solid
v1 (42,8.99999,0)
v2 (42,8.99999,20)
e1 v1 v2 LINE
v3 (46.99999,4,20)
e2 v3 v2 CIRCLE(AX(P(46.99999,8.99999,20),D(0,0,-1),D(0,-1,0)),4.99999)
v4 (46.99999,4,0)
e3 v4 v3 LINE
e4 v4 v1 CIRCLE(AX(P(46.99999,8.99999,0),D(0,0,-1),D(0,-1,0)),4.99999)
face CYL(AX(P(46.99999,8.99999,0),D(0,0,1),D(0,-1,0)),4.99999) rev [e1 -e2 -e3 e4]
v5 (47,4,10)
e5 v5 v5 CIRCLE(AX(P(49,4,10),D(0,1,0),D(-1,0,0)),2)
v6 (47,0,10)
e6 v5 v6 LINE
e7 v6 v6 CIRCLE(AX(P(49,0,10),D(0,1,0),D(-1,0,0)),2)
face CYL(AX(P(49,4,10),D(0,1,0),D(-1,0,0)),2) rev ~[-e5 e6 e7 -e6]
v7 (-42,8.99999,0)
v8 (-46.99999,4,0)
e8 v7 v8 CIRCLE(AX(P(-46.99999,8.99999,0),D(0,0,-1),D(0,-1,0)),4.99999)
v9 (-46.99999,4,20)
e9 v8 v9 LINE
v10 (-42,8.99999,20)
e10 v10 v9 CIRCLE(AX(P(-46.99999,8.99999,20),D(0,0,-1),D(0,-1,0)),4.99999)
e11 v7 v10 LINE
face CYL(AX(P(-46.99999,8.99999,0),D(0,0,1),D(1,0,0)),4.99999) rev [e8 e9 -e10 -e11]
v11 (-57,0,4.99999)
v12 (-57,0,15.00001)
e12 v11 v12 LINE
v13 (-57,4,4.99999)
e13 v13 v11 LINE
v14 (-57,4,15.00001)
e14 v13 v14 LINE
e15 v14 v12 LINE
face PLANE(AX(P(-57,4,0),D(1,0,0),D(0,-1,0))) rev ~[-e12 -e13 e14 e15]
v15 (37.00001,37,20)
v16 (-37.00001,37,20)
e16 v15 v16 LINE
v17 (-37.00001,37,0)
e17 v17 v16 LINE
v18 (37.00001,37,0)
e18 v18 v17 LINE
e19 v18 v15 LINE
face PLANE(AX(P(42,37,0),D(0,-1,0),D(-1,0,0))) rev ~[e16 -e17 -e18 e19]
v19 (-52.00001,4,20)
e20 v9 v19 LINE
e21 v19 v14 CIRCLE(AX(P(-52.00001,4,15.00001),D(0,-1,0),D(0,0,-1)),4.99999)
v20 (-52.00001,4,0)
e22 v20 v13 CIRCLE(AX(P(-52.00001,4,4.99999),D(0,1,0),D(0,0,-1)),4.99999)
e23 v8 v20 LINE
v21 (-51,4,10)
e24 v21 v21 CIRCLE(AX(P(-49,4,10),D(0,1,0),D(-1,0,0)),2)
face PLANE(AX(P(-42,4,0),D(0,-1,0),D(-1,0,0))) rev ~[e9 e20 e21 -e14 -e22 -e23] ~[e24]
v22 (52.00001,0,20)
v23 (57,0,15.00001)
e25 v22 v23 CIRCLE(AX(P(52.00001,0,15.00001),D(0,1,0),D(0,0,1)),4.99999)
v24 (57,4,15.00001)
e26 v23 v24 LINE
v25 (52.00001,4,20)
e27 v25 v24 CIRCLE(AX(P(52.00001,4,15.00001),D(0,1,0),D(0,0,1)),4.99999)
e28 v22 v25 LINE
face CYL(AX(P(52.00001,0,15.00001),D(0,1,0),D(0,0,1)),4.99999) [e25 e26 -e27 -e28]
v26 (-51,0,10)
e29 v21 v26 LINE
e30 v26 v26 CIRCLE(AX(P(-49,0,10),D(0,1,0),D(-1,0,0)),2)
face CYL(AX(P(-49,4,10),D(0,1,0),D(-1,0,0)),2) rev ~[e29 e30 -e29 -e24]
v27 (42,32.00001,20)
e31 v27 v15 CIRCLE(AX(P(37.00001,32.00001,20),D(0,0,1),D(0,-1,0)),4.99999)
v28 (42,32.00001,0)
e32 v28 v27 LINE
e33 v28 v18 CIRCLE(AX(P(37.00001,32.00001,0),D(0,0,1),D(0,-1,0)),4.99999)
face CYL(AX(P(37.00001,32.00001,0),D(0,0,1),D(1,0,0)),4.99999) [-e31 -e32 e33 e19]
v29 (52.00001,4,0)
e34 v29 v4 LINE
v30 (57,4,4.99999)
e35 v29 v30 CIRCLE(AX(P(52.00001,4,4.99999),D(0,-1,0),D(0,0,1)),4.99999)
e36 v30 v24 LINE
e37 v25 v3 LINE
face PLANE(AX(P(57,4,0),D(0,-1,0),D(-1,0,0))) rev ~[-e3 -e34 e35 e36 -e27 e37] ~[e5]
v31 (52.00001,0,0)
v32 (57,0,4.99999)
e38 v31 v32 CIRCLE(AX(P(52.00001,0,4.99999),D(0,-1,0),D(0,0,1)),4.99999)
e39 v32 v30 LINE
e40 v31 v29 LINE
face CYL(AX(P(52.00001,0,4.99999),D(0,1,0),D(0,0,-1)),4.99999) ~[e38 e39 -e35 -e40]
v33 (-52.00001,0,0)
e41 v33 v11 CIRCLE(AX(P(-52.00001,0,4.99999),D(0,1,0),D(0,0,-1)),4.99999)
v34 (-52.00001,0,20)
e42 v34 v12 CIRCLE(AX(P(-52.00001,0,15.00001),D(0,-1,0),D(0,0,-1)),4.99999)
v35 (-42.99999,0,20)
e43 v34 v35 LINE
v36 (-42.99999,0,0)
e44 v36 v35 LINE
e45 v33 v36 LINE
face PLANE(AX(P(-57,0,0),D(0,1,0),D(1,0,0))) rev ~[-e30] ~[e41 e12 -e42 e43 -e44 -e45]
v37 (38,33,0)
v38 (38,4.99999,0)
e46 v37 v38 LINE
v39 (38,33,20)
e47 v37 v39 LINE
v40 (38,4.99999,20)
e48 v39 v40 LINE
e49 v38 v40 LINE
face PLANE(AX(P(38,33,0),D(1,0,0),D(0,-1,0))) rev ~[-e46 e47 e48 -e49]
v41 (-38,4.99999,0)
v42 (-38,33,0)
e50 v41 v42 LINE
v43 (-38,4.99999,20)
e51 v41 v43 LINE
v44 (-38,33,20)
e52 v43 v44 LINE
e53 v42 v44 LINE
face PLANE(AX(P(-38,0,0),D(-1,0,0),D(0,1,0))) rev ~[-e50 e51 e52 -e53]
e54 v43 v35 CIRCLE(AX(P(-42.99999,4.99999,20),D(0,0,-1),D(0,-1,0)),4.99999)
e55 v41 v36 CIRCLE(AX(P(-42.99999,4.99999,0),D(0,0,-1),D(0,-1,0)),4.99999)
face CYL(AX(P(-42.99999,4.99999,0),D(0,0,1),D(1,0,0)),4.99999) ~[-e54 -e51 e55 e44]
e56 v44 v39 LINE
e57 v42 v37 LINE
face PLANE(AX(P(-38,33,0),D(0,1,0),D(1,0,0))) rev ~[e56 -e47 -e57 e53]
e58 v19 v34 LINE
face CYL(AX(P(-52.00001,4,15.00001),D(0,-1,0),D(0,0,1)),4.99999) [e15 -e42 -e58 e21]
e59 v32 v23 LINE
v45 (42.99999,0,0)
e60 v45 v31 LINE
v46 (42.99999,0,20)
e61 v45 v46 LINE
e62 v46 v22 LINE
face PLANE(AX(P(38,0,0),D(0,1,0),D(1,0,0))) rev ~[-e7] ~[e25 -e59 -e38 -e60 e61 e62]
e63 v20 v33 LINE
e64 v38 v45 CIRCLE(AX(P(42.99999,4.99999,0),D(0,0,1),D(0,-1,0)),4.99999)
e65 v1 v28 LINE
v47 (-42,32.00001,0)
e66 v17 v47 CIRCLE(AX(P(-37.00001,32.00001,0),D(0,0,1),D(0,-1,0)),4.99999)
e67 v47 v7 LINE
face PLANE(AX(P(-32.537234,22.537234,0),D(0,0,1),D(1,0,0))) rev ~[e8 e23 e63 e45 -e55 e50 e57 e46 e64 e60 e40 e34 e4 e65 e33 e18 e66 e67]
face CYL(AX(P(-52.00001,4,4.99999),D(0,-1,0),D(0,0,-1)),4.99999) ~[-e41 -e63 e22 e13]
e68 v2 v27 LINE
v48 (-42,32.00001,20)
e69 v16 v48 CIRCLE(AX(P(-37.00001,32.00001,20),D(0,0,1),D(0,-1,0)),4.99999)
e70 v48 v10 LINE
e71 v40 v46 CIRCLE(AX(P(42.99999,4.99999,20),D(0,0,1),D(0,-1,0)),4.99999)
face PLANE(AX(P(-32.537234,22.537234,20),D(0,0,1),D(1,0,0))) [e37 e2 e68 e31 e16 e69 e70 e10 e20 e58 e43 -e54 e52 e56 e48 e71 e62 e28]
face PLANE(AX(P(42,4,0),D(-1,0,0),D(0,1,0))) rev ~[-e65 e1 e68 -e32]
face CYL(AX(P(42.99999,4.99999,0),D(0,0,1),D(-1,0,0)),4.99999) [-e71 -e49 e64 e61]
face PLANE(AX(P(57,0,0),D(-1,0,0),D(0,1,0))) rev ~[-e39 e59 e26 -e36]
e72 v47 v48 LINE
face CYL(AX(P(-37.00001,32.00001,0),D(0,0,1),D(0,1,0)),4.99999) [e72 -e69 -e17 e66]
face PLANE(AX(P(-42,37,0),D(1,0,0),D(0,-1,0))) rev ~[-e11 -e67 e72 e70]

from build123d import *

# Parameters (mm, degrees)
F1_DEPTH = 20
F2_R     = 2
F3_DEPTH = 25
F4_R     = 4.99999


# Not quite as in the source:
# - a fillet or chamfer is up to 0.001 mm smaller than in the source, because OpenCascade refuses the exact size


with BuildPart() as f1:
    # F0 (on Top) → F1 (new body)
    with BuildSketch(Plane.XY):
        Polygon((-38, 33), (0, 33), (0, 37), (-42, 37), (-42, 4), (-57, 4), (-57, 0), (-38, 0), align=None)
        Polygon((0, 37), (0, 33), (38, 33), (38, 0), (57, 0), (57, 4), (42, 4), (42, 37), align=None)
    extrude(amount=F1_DEPTH)

    # F2 (on face) → F3 (cut)
    with BuildSketch(Plane(origin=(0, 4, 0), x_dir=(-1, 0, 0), z_dir=(0, 1, 0))):
        with Locations((49, 10)):
            Circle(F2_R)
        with Locations((-49, 10)):
            Circle(F2_R)
    extrude(amount=-F3_DEPTH, mode=Mode.SUBTRACT)

    # F4 (radius 5 in the source; OpenCascade refuses exactly that, so slightly less here)
    f4_edges = [f1.edges().sort_by_distance(p)[0] for p in [
        (-57, 2, 20),
        (-57, 2, 0),
        (57, 2, 0),
        (57, 2, 20),
        (42, 37, 10),
        (-42, 37, 10),
        (-38, 0, 10),
        (38, 0, 10),
        (42, 4, 10),
        (-42, 4, 10),
    ]]
    fillet(f4_edges, radius=F4_R)


solid = f1.part
